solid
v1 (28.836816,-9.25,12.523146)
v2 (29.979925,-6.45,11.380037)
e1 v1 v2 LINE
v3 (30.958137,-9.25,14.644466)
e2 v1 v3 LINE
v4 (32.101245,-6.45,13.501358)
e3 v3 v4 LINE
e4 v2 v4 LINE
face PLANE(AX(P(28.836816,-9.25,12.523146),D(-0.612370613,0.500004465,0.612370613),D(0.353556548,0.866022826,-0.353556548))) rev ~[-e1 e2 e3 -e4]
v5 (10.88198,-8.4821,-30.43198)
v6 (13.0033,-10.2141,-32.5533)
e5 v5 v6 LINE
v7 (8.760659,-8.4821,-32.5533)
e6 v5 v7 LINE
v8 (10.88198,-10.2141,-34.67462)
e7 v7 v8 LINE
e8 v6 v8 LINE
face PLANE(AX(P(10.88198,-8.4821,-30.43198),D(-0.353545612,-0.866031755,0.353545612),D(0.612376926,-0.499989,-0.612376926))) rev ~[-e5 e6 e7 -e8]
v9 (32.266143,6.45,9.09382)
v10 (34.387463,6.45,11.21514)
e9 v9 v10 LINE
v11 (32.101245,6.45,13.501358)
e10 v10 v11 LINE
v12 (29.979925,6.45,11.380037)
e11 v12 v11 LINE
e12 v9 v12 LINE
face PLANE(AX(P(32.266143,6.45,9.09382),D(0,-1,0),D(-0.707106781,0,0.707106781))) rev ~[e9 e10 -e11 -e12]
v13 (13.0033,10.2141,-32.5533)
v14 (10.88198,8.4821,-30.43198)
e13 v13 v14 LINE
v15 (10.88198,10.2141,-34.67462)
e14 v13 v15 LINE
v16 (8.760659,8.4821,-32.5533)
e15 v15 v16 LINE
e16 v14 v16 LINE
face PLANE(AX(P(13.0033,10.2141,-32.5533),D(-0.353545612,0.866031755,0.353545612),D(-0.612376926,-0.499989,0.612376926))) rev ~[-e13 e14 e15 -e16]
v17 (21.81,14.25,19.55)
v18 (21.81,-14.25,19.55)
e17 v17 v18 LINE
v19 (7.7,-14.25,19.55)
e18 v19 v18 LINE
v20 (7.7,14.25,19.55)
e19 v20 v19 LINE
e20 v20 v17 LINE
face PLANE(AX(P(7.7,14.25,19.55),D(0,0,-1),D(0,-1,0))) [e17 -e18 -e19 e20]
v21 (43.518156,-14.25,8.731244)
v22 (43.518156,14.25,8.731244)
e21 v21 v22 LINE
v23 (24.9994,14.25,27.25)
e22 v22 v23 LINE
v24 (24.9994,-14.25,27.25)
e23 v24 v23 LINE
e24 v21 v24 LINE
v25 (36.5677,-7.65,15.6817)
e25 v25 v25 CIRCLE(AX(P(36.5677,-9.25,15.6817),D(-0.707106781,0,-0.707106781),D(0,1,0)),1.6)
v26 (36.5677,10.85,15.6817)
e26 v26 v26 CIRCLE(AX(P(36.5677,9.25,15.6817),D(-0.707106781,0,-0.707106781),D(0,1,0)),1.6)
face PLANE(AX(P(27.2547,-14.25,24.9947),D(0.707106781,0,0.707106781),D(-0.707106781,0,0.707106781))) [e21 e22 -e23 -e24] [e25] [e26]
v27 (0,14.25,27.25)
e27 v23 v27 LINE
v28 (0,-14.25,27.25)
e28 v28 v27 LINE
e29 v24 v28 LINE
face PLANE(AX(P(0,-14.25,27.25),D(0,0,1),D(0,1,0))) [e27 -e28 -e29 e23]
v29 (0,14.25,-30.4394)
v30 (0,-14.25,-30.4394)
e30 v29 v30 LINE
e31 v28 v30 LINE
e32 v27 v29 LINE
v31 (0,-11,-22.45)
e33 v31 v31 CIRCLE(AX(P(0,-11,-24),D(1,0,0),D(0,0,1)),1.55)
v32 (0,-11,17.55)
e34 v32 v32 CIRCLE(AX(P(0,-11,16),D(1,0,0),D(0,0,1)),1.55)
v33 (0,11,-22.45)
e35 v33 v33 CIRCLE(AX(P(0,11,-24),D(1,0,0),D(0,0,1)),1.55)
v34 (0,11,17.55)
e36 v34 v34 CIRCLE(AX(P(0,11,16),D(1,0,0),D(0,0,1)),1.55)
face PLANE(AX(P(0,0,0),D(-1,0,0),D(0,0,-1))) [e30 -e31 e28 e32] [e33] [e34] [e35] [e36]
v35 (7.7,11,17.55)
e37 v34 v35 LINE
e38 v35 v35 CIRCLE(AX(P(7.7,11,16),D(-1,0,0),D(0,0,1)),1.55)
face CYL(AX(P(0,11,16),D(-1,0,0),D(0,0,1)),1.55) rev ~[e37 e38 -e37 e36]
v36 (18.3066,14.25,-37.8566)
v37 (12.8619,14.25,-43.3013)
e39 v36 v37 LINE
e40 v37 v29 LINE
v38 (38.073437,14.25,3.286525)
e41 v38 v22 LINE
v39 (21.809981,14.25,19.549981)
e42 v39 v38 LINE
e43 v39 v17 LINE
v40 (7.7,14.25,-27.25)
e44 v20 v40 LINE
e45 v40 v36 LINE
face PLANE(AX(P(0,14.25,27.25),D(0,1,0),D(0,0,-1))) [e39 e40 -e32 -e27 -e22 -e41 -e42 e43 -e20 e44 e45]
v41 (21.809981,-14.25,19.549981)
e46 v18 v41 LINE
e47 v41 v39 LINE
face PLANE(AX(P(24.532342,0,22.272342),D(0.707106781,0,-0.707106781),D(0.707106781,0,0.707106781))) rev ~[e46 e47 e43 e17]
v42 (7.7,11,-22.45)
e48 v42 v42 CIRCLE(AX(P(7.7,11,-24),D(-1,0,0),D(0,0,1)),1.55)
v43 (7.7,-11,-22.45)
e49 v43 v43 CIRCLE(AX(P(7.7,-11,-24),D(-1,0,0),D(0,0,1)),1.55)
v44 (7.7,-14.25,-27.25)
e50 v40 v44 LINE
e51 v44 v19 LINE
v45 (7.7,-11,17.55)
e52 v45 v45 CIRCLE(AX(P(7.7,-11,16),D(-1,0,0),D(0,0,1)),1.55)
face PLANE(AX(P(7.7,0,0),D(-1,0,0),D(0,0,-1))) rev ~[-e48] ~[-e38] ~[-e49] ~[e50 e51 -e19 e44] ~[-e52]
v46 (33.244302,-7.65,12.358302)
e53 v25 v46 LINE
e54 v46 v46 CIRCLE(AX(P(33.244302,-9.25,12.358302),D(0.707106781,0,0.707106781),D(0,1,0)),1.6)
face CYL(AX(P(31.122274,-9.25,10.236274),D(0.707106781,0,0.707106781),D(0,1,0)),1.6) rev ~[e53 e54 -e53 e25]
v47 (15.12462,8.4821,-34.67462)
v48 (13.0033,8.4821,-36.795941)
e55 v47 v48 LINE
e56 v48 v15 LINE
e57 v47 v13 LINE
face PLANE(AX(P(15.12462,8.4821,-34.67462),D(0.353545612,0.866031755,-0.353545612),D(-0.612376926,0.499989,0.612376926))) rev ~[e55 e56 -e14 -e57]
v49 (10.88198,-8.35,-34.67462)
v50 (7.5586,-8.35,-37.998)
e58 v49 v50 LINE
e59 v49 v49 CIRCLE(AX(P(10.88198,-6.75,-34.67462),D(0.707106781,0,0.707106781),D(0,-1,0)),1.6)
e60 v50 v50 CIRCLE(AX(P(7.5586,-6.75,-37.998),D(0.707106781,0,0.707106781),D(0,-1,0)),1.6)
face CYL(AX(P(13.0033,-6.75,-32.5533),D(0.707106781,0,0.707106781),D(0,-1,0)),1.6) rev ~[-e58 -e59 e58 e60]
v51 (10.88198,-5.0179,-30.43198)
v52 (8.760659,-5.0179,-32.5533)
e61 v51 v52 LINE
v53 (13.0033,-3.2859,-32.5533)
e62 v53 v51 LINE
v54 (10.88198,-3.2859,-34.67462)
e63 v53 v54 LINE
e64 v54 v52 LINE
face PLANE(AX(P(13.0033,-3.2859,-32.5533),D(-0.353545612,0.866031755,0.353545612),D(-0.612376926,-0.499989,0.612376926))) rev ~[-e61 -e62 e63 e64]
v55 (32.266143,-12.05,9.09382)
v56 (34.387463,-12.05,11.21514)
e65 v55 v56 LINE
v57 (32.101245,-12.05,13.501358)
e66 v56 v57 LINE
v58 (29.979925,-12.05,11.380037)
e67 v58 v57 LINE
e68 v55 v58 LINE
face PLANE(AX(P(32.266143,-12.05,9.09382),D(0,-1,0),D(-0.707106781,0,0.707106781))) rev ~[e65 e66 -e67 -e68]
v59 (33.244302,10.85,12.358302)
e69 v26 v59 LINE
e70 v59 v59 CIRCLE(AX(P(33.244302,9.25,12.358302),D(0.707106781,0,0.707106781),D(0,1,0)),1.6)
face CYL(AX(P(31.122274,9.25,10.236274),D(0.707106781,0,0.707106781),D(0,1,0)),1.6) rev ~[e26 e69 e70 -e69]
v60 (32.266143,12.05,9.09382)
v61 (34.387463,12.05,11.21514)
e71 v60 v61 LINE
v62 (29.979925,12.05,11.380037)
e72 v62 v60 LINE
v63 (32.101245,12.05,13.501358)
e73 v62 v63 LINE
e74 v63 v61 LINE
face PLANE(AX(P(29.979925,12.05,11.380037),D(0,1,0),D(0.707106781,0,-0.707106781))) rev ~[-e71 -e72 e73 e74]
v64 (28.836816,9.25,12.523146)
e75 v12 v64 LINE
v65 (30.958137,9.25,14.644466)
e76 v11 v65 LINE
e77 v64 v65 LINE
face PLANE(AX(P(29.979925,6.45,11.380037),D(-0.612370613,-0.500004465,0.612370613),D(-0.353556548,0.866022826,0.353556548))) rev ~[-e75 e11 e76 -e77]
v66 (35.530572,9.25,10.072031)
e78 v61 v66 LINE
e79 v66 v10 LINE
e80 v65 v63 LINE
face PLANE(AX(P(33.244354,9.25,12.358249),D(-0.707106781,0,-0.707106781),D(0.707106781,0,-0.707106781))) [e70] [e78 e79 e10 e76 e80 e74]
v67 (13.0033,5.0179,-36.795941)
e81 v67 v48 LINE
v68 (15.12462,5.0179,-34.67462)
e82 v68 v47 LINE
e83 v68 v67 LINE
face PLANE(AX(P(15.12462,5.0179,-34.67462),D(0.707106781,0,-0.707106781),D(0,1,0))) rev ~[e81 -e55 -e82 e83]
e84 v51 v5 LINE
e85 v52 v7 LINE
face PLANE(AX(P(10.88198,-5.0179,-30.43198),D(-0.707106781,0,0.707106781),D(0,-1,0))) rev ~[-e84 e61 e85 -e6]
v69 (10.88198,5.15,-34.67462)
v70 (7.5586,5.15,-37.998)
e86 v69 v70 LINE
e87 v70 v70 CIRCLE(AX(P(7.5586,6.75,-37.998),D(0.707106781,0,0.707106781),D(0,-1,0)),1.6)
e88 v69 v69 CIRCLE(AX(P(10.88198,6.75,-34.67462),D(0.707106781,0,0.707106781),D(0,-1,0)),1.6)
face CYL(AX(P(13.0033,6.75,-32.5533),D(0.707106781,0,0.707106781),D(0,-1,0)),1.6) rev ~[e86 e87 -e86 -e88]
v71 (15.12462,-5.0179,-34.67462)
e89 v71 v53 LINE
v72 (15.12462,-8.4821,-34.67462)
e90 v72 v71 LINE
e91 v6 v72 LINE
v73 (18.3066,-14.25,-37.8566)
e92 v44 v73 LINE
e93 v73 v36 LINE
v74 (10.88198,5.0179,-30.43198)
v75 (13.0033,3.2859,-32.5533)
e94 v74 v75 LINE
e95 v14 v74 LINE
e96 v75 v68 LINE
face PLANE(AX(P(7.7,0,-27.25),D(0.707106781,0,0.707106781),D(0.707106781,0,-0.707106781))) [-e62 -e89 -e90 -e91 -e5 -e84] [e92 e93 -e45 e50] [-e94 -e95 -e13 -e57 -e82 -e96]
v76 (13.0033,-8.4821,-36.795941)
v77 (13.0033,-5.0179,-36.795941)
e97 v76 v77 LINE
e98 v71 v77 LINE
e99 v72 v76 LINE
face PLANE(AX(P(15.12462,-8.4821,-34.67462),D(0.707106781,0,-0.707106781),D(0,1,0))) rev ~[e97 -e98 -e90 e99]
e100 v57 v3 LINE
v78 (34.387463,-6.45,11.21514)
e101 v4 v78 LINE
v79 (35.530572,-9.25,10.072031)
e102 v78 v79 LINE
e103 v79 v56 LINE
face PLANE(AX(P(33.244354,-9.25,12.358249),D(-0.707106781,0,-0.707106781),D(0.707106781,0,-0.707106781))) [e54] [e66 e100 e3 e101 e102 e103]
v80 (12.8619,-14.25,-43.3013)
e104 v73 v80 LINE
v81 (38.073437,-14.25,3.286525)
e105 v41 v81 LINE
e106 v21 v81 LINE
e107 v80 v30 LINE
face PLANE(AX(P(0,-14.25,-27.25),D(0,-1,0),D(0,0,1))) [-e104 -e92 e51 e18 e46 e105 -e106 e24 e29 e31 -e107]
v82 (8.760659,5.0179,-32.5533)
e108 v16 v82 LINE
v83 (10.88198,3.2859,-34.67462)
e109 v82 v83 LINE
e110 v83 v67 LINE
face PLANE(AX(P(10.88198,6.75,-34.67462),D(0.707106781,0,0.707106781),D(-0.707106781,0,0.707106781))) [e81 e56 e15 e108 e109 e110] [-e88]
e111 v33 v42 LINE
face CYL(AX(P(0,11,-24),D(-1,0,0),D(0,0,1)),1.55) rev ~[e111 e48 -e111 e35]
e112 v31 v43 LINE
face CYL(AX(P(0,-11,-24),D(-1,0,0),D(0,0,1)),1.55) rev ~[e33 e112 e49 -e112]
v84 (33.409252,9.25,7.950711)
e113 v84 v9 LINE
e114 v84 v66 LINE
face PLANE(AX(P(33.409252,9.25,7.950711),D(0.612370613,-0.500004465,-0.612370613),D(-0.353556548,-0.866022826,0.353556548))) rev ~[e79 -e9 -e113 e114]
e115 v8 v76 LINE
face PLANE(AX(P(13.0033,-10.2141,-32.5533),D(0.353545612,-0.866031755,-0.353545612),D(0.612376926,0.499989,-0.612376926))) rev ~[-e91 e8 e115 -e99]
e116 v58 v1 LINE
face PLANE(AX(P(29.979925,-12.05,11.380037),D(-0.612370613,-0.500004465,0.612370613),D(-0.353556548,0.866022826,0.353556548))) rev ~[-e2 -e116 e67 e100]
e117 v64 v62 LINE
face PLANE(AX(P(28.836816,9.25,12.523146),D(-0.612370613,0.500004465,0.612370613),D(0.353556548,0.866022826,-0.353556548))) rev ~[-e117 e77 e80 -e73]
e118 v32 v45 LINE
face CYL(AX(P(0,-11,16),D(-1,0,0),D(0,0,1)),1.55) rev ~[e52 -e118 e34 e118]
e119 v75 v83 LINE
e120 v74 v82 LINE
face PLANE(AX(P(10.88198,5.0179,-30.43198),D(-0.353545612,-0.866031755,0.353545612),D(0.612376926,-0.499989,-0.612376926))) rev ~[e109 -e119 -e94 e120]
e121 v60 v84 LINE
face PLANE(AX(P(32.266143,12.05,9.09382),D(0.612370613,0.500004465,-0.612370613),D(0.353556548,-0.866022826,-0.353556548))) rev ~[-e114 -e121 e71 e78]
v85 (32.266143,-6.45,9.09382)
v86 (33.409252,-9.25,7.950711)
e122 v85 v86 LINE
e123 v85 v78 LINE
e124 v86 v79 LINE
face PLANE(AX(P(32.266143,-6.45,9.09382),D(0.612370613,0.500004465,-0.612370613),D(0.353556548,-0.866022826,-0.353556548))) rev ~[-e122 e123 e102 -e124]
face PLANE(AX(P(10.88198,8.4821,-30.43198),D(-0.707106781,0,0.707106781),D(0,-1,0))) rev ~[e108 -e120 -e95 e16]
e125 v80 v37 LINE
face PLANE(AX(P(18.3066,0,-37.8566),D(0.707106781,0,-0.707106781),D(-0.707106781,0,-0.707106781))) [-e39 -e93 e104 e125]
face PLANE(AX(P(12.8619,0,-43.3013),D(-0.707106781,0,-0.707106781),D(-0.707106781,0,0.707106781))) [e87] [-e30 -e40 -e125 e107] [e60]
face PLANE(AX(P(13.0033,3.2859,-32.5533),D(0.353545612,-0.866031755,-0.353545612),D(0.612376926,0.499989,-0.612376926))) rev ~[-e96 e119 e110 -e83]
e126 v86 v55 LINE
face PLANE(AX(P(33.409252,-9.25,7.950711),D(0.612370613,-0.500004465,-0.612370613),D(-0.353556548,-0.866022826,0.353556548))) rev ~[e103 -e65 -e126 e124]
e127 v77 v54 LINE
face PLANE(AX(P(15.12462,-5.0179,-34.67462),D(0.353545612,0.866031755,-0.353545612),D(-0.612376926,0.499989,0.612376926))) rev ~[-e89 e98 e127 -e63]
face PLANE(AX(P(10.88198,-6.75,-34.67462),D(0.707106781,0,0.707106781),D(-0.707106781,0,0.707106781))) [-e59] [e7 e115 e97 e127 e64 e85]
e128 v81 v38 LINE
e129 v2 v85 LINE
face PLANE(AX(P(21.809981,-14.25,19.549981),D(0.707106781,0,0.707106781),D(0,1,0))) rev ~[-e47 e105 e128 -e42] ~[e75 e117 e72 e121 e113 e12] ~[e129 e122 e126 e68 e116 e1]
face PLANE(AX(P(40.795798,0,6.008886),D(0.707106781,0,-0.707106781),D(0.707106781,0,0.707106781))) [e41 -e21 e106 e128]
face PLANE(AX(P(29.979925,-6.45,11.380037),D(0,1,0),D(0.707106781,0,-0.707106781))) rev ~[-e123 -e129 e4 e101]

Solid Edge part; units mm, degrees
sketch "Sketch1" plane through (0, 0, 0) normal (1, 0, 0) x (0, 1, 0)
  line L0 (-14.25, -27.25) -> (-14.25, 27.25)
  line L1 (-14.25, 27.25) -> (14.25, 27.25)
  line L2 (14.25, 27.25) -> (14.25, -27.25)
  line L3 (14.25, -27.25) -> (-14.25, -27.25)
extrude "Protrusion1" add sketch "Sketch1" along normal blind 7.7
sketch "Sketch2" plane through (7.7, 0, 0) normal (1, 0, 0) x (0, 1, 0)
  line L0 (14.25, 19.55) -> (-14.25, 19.55)
  line L1 (-14.25, 19.55) -> (-14.25, 27.25)
  line L2 (-14.25, 27.25) -> (14.25, 27.25)
  line L3 (14.25, 27.25) -> (14.25, 19.55)
extrude "Extrusionsausprägung_2" add sketch "Sketch2" along normal blind 14.11
hole "Bohrung_1" at (0, 11, -24) direction (1, 0, 0) diameter 3.1 end through all
pattern_linear "Pattern1" count 2 spacing 22 along (0, -1, 0) count 2 spacing 40 along (0, 0, 1) of "Bohrung_1"
draft "Formschräge_3" angle 45 neutral plane through (18.75, 0, 19.55) normal (0, 0, -1) pull direction (0, 0, -1) face at (21.81, 9.215, 26.0437)
sketch "Sketch3" plane through (29.505, 0, 27.245) normal (0.7071068, 0, -0.7071068) x (0, 1, 0)
  line L0 (-14.25, -10.8824) -> (14.25, -10.8824)
  line L1 (14.25, -10.8824) -> (14.25, -3.1824)
  line L2 (14.25, -3.1824) -> (-14.25, -3.1824)
  line L3 (-14.25, -3.1824) -> (-14.25, -10.8824)
  dimension "D1" = 28.5
  dimension "D2" = 7.7
extrude "Extrusionsausprägung_3" add sketch "Sketch3" along normal blind 23
sketch "Sketch4" plane through (32.5061, -14.25, 0) normal (0, -1, 0) x (1, 0, 0)
  line L0 (-5.2514, 24.9947) -> (-7.5067, 27.25)
extrude "Cutout1" cut sketch "Sketch4" against normal through all material side at (26.1624, -14.25, 26.1577)
hole "Bohrung_10" at (31.123, -9.25, 10.237) direction (0.7071068, 0, 0.7071068) diameter 3.2 end up to next
hole "Hole1" at (31.123, 9.25, 10.237) direction (0.7071068, 0, 0.7071068) diameter 3.2 end up to next
sketch "Sketch5" plane through (28.8811, 0, 12.4789) normal (-0.7071068, 0, -0.7071068) x (0.7071068, 0, -0.7071068)
  line L0 (4.7872, 12.05) -> (1.554, 12.05)
  line L1 (1.554, 12.05) -> (-0.0626, 9.25)
  line L2 (-0.0626, 9.25) -> (1.554, 6.45)
  line L3 (1.554, 6.45) -> (4.7872, 6.45)
  line L4 (4.7872, 6.45) -> (6.4038, 9.25)
  line L5 (6.4038, 9.25) -> (4.7872, 12.05)
  dimension "D1" = 5.6
extrude "Extrusionsausschnitt_2" cut sketch "Sketch5" against normal blind 3
sketch "Sketch6" plane through (28.8811, 0, 12.4789) normal (-0.7071068, 0, -0.7071068) x (0.7071068, 0, -0.7071068)
  line L0 (4.7872, -12.05) -> (6.4038, -9.25)
  line L1 (6.4038, -9.25) -> (4.7872, -6.45)
  line L2 (4.7872, -6.45) -> (1.554, -6.45)
  line L3 (1.554, -6.45) -> (-0.0626, -9.25)
  line L4 (-0.0626, -9.25) -> (1.554, -12.05)
  line L5 (1.554, -12.05) -> (4.7872, -12.05)
  dimension "D1" = 5.6
extrude "Extrusionsausschnitt_3" cut sketch "Sketch6" against normal blind 3
sketch "Sketch7" plane through (0, 0, 0) normal (0, -1, 0) x (1, 0, 0)
  line L0 (7.7, -27.25) -> (18.3066, -37.8566)
  line L1 (18.3066, -37.8566) -> (12.8619, -43.3013)
  line L2 (12.8619, -43.3013) -> (0, -30.4394)
  line L3 (0, -30.4394) -> (0, -27.25)
  line L4 (0, -27.25) -> (7.7, -27.25)
extrude "Extrusionsausprägung_14" add sketch "Sketch7" along normal mid plane 28.5
sketch "Sketch8" plane through (13.0033, 0, -32.5533) normal (0.7071068, 0, 0.7071068) x (0.7071068, 0, -0.7071068)
  line L0 (3, 5.0179) -> (3, 8.4821)
  line L1 (3, 8.4821) -> (0, 10.2141)
  line L2 (0, 10.2141) -> (-3, 8.4821)
  line L3 (-3, 8.4821) -> (-3, 5.0179)
  line L4 (-3, 5.0179) -> (0, 3.2859)
  line L5 (0, 3.2859) -> (3, 5.0179)
  line L6 (3, -8.4821) -> (3, -5.0179)
  line L7 (3, -5.0179) -> (0, -3.2859)
  line L8 (0, -3.2859) -> (-3, -5.0179)
  line L9 (-3, -5.0179) -> (-3, -8.4821)
  line L10 (-3, -8.4821) -> (0, -10.2141)
  line L11 (0, -10.2141) -> (3, -8.4821)
extrude "Extrusionsausschnitt_6" cut sketch "Sketch8" against normal blind 3
hole "Bohrung_12" at (13.0033, 6.75, -32.5533) direction (-0.7071068, 0, -0.7071068) diameter 3.2 end up to next
hole "Hole2" at (13.0033, -6.75, -32.5533) direction (-0.7071068, 0, -0.7071068) diameter 3.2 end up to next
hole "Hole3" [suppressed]
hole "Hole4" [suppressed]
properties material "Finger_Unterbau"
